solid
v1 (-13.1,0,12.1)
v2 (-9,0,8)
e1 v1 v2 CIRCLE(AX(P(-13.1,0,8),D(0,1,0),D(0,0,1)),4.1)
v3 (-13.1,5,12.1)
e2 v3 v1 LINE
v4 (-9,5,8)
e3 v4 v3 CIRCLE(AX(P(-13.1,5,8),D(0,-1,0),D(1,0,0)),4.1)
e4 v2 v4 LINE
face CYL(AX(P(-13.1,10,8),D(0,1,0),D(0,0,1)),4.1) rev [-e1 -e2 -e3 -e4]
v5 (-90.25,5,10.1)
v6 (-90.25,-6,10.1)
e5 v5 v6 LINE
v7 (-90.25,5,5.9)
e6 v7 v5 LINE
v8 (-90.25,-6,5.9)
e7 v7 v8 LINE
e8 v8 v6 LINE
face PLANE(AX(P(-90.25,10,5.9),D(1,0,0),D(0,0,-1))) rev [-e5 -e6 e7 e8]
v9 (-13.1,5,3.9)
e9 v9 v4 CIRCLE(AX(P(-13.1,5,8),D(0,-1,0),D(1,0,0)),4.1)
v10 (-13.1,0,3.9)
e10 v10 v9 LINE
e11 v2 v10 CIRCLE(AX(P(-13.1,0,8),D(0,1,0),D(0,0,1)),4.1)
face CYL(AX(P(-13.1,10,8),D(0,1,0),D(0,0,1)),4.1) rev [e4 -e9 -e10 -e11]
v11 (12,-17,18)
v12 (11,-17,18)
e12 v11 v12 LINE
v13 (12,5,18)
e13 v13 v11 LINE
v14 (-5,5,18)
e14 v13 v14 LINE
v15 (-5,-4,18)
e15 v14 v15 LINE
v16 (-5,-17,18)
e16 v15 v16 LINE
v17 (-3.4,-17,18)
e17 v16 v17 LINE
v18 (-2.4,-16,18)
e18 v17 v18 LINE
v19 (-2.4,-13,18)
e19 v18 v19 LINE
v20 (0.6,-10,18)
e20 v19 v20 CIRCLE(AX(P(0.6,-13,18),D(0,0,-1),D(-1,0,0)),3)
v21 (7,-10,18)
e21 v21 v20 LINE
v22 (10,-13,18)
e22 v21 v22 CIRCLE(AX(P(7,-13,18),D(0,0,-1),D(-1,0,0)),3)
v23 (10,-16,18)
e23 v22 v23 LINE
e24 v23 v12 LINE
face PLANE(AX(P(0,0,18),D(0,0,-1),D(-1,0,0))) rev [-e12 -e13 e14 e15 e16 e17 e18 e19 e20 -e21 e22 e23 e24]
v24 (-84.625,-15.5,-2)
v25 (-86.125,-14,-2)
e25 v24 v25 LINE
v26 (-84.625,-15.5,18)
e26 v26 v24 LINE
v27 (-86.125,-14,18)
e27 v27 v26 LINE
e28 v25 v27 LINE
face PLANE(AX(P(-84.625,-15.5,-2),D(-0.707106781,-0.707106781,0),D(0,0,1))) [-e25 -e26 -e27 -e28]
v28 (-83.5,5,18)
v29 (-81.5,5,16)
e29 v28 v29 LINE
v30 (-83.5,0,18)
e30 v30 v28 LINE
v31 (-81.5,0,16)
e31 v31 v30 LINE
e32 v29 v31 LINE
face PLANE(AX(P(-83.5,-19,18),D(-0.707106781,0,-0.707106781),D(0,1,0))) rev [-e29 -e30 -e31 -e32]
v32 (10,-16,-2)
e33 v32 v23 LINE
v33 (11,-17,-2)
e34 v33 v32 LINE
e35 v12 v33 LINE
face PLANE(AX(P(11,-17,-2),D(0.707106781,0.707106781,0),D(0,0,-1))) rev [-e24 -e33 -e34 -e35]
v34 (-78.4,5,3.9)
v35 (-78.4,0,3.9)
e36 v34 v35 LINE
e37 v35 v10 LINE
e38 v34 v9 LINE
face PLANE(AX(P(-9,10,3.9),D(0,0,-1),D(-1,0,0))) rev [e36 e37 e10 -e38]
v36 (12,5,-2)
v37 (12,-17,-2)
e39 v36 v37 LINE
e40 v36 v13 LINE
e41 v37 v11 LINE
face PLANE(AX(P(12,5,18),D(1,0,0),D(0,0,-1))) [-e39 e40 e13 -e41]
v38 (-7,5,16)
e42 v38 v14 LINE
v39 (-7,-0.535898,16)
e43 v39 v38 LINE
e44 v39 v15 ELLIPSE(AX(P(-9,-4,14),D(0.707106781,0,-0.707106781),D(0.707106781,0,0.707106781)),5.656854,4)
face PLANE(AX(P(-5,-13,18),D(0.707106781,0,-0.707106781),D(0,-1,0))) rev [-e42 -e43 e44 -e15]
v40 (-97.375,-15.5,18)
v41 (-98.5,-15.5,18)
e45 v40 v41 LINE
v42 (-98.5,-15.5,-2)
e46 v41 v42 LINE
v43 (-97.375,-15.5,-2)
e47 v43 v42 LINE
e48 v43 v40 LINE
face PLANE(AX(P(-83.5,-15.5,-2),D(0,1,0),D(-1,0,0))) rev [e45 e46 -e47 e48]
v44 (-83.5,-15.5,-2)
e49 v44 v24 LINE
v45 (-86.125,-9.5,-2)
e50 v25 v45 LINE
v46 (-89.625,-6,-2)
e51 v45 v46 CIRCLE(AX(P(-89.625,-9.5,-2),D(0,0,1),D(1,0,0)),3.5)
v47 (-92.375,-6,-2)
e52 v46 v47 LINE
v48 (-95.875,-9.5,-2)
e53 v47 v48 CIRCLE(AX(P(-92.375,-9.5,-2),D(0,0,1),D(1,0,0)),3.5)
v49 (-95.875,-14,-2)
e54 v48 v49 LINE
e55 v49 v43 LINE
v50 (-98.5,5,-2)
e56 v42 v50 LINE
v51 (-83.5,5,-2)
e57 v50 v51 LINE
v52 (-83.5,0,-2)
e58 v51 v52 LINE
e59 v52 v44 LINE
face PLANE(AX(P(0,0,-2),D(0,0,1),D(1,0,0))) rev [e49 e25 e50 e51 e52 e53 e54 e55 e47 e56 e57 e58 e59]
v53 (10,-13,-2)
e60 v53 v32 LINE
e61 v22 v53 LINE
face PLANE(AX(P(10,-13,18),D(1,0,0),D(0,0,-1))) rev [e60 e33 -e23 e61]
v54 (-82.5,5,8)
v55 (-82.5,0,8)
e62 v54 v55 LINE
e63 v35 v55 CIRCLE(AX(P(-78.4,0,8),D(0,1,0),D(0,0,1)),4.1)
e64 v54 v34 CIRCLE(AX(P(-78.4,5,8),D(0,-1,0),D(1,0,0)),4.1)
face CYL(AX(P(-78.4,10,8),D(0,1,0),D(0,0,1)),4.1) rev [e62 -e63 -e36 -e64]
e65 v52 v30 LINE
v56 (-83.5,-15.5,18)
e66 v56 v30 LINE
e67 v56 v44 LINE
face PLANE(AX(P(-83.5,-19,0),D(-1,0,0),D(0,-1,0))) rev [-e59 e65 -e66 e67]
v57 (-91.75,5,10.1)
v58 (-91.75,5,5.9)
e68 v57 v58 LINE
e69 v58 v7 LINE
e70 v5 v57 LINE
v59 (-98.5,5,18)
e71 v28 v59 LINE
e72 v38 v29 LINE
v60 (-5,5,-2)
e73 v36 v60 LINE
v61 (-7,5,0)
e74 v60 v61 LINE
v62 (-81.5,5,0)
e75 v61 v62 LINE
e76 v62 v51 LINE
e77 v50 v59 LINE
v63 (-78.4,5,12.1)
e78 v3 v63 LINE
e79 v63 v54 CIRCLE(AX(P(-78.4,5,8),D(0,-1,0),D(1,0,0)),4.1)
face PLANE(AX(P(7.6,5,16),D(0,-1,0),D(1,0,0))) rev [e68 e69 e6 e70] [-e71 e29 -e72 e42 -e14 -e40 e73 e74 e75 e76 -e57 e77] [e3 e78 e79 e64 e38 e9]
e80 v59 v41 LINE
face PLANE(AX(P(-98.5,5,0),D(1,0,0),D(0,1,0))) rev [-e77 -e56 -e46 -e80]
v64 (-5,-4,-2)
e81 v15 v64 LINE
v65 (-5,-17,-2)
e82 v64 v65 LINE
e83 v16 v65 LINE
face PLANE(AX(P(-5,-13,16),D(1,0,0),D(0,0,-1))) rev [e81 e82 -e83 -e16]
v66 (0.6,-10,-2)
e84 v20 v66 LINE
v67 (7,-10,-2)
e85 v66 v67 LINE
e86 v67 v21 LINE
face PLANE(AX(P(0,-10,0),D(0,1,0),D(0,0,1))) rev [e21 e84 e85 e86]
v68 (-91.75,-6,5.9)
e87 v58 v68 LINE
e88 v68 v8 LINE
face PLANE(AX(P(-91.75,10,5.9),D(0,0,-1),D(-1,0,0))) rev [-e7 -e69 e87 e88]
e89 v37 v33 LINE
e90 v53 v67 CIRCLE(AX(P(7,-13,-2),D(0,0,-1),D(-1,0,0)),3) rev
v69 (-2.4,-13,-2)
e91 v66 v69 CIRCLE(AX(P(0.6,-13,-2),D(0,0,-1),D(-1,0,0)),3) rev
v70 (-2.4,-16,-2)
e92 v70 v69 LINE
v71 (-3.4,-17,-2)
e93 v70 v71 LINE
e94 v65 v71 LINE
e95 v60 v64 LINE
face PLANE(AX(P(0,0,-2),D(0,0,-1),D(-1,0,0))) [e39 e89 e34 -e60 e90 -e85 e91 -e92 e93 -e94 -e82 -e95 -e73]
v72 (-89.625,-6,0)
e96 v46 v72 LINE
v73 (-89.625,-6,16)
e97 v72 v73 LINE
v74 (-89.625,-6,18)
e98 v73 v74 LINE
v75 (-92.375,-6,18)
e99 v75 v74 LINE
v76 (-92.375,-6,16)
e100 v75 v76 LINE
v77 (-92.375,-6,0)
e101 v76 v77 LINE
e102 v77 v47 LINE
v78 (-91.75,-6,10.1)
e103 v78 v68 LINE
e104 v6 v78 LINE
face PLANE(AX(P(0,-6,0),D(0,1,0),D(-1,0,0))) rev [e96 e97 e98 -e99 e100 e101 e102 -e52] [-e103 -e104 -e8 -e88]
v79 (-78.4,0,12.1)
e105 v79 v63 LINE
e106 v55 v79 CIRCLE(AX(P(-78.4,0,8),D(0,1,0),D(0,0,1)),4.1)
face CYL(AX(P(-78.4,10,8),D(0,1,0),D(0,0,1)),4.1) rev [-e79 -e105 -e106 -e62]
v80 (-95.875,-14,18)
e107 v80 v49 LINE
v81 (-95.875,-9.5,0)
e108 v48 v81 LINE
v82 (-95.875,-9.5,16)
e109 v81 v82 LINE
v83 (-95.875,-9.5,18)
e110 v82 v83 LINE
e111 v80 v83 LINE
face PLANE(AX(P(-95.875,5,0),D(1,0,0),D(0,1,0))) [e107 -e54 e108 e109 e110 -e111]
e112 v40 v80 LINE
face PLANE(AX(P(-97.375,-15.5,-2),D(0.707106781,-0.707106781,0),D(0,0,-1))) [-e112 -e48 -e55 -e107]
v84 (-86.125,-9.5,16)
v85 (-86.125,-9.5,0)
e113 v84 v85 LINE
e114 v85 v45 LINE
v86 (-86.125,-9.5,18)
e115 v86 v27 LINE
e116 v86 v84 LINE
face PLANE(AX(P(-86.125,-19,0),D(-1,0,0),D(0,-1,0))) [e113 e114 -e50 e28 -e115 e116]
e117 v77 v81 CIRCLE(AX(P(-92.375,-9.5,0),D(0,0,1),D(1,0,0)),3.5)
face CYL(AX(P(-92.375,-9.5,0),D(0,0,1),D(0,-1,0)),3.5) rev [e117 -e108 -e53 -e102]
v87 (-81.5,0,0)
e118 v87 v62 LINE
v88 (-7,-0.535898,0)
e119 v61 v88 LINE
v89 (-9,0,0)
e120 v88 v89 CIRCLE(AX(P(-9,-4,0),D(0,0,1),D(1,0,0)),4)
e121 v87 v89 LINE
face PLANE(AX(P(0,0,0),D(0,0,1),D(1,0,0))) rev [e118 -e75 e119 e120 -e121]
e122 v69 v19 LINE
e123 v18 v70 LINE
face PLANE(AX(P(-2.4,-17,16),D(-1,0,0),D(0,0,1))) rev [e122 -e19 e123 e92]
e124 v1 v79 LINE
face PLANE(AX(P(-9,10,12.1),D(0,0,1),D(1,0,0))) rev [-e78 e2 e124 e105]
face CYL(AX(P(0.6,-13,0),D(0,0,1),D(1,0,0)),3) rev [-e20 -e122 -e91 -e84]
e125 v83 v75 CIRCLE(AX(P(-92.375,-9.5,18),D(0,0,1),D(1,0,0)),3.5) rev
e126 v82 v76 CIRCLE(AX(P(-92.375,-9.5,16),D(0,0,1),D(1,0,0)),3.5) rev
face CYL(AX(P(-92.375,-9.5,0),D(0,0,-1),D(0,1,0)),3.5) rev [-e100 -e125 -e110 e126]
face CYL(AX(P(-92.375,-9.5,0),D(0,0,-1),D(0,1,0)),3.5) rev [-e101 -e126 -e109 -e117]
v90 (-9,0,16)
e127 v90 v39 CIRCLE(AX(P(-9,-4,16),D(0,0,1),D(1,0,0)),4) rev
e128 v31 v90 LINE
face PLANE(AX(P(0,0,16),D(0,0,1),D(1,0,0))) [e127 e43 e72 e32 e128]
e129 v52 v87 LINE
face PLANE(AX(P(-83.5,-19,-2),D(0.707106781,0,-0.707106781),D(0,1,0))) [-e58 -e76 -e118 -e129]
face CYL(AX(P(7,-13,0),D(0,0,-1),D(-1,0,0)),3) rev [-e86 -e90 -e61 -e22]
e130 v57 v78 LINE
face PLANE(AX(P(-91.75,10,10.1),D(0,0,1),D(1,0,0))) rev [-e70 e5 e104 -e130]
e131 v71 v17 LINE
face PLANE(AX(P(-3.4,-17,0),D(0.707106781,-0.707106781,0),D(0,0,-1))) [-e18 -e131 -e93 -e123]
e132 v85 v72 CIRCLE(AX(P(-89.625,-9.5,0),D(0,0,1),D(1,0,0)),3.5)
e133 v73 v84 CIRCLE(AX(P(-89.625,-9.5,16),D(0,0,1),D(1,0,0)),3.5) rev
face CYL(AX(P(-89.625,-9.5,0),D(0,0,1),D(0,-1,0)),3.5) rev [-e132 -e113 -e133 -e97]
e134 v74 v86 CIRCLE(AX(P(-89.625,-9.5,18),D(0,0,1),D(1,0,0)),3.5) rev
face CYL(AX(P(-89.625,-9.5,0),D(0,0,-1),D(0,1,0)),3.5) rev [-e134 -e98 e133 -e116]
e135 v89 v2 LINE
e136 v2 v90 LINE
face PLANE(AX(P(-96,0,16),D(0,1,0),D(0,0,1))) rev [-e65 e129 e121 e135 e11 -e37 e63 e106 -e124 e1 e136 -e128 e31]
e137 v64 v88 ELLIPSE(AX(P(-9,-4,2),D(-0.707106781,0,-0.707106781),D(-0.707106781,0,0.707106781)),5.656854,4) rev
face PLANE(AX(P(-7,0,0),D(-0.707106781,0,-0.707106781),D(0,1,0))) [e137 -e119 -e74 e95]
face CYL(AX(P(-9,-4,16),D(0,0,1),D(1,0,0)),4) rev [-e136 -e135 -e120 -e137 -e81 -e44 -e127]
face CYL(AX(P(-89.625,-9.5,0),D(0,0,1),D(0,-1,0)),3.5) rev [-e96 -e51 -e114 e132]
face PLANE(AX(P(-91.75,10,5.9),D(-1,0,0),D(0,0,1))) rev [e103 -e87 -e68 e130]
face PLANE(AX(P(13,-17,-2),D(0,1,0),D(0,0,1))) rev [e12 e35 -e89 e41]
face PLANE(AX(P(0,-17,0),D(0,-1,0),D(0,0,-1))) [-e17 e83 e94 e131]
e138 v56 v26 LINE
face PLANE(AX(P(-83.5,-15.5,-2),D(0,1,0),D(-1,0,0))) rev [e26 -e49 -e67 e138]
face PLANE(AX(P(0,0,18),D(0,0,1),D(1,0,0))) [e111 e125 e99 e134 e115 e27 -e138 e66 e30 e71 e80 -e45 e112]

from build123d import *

# Parameters (mm, degrees)
EXTRUDE_1_DEPTH       = 16
SKETCH_4_W            = 1.5
SKETCH_4_H            = 4.2
SKETCH_4_W_2          = 73.5
SKETCH_4_H_2          = 8.2
CUT_EXTRUDE_1_DEPTH   = 10
FILLET_1_R            = 4.1
SKETCH_6_W            = 10
SKETCH_6_H            = 16
SKETCH_6_W_2          = 1.5
SKETCH_6_H_2          = 4.2
EXTRUDE_4_DEPTH       = 11
EXTRUDE_6_DEPTH       = 13
EXTRUDE_6_DEPTH_BACK  = 11
SKETCH_10_W           = 0.125
SKETCH_10_H           = 16
SKETCH_10_W_2         = 2.5
FILLET_2_R            = 3.5
EXTRUDE_7_DEPTH       = 2
EXTRUDE_8_DEPTH       = 2
FILLET_4_R            = 3.5
CUT_EXTRUDE_START     = -15
SKETCH_13_W           = 20
SKETCH_13_H           = 3.5
CUT_EXTRUDE_2_DEPTH   = 15
CHAMFER_1_SIZE        = 2
CHAMFER_2_SIZE        = 1.5
SKETCH_14_W           = 5
SKETCH_14_H           = 16
EXTRUDE_9_DEPTH       = 13
SKETCH_15_W           = 2.6
SKETCH_15_H           = 16
EXTRUDE_10_DEPTH      = 4
EXTRUDE_11_DEPTH      = 2
EXTRUDE_11_DEPTH_BACK = 18
CHAMFER_4_SIZE        = 2
SKETCH_19_W           = 12
SKETCH_19_H           = 20
EXTRUDE_12_DEPTH      = 26.5
SKETCH_20_W           = 10
SKETCH_20_H           = 20
CUT_EXTRUDE_3_DEPTH   = 8.5
FILLET_6_R            = 4
SKETCH_21_W           = 12.4
SKETCH_21_H           = 20
CUT_EXTRUDE_4_DEPTH   = 3
FILLET_7_R            = 3
SKETCH_22_W           = 20
SKETCH_22_H           = 4.5
CUT_EXTRUDE_5_DEPTH   = 3
CHAMFER_5_SIZE        = 1


# Some blends are built 0.0001 mm under size
with BuildPart() as part:
    # 스케치1 → 보스-돌출1 (new body)
    with BuildSketch(Plane.XY):
        Polygon((-96, 0), (0, 0), (0, -21.5), (7.6, -21.5), (7.6, 5), (-96, 5), align=None)
    extrude(amount=EXTRUDE_1_DEPTH)

    # 스케치4 → 컷-돌출1 (cut)
    with BuildSketch(Plane.XZ):
        with Locations((-91, 8)):
            Rectangle(SKETCH_4_W, SKETCH_4_H)
        with Locations((-45.75, 8)):
            Rectangle(SKETCH_4_W_2, SKETCH_4_H_2)
    extrude(amount=-CUT_EXTRUDE_1_DEPTH, mode=Mode.SUBTRACT)

    # 필렛1
    fillet_1_edges = [part.edges().sort_by_distance(p)[0] for p in [
        (-82.5, 2.5, 3.9),
        (-82.5, 2.5, 12.1),
        (-9, 2.5, 3.9),
        (-9, 2.5, 12.1),
    ]]
    fillet(fillet_1_edges, radius=FILLET_1_R - 0.0001)  # a hair under: the kernel refuses the full size

    # 스케치6 → 보스-돌출4 (add)
    with BuildSketch(Plane(origin=(0, 5, 0), x_dir=(1, 0, 0), z_dir=(0, 1, 0))):
        with Locations((-91, -8)):
            Rectangle(SKETCH_6_W, SKETCH_6_H)
        with Locations((-91, -8)):
            Rectangle(SKETCH_6_W_2, SKETCH_6_H_2, mode=Mode.SUBTRACT)
    extrude(amount=-EXTRUDE_4_DEPTH)

    # 스케치10 → 보스-돌출6 (add, two sides: drawn at the far end of the back side and taken through both)
    with BuildSketch(Plane.XZ.offset(6).offset(-EXTRUDE_6_DEPTH_BACK)):
        with Locations((-95.9375, 8)):
            Rectangle(SKETCH_10_W, SKETCH_10_H)
        with Locations((-97.25, 8)):
            Rectangle(SKETCH_10_W_2, SKETCH_10_H)
        with Locations((-86.0625, 8)):
            Rectangle(SKETCH_10_W, SKETCH_10_H)
        with Locations((-84.75, 8)):
            Rectangle(SKETCH_10_W_2, SKETCH_10_H)
    extrude(amount=EXTRUDE_6_DEPTH + EXTRUDE_6_DEPTH_BACK)

    # 필렛2
    fillet_2_edges = [part.edges().sort_by_distance(p)[0] for p in [
        (-95.875, -6, 8),
        (-86.125, -6, 8),
    ]]
    fillet(fillet_2_edges, radius=FILLET_2_R)

    # 스케치11 → 보스-돌출7 (add)
    with BuildSketch(Plane.XY.offset(16)):
        Polygon((-98.5, 5), (-98.5, -19), (-95.875, -19), (-95.875, -6), (-86.125, -6), (-86.125, -19), (-83.5, -19), (-83.5, 5), align=None)
    extrude(amount=EXTRUDE_7_DEPTH)

    # 스케치12 → 보스-돌출8 (add)
    with BuildSketch(Plane(origin=(0, 0, 0), x_dir=(-1, 0, 0), z_dir=(0, 0, -1))):
        Polygon((83.5, 5), (83.5, -19), (86.125, -19), (86.125, -6), (95.875, -6), (95.875, -19), (98.5, -19), (98.5, 5), align=None)
    extrude(amount=EXTRUDE_8_DEPTH)

    # 필렛4
    fillet_4_edges = [part.edges().sort_by_distance(p)[0] for p in [
        (-95.875, -6, -1),
        (-86.125, -6, -1),
        (-86.125, -6, 17),
        (-95.875, -6, 17),
    ]]
    fillet(fillet_4_edges, radius=FILLET_4_R)

    # 스케치13 → 컷-돌출2 (cut)
    with BuildSketch(Plane.ZY.offset(98.5).offset(CUT_EXTRUDE_START)):
        with Locations((8, -17.25)):
            Rectangle(SKETCH_13_W, SKETCH_13_H)
    extrude(amount=CUT_EXTRUDE_2_DEPTH, mode=Mode.SUBTRACT)

    # 모따기1
    chamfer_1_edges = [part.edges().sort_by_distance(p)[0] for p in [
        (-83.5, 2.5, 0),
        (-83.5, 2.5, 16),
    ]]
    chamfer(chamfer_1_edges, length=CHAMFER_1_SIZE - 0.0001)  # a hair under: the kernel refuses the full size

    # 모따기2
    chamfer_2_edges = [part.edges().sort_by_distance(p)[0] for p in [
        (-95.875, -15.5, 8),
        (-86.125, -15.5, 8),
    ]]
    chamfer(chamfer_2_edges, length=CHAMFER_2_SIZE)

    # 스케치14 → 보스-돌출9 (add)
    with BuildSketch(Plane.XZ):
        with Locations((-2.5, 8)):
            Rectangle(SKETCH_14_W, SKETCH_14_H)
    extrude(amount=EXTRUDE_9_DEPTH)

    # 스케치15 → 보스-돌출10 (add)
    with BuildSketch(Plane.XZ.offset(13)):
        with Locations((-3.7, 8)):
            Rectangle(SKETCH_15_W, SKETCH_15_H)
    extrude(amount=EXTRUDE_10_DEPTH)

    # 스케치18 → 보스-돌출11 (add, two sides: drawn at the far end of the back side and taken through both)
    with BuildSketch(Plane.XY.offset(16).offset(-EXTRUDE_11_DEPTH_BACK)):
        Polygon((-5, -17), (-5, 5), (7.6, 5), (7.6, -21.5), (0, -21.5), (0, -13), (-2.4, -13), (-2.4, -17), align=None)
    extrude(amount=EXTRUDE_11_DEPTH + EXTRUDE_11_DEPTH_BACK)

    # 모따기4
    chamfer_4_edges = [part.edges().sort_by_distance(p)[0] for p in [
        (-5, 2.5, 0),
        (-5, 2.5, 16),
    ]]
    chamfer(chamfer_4_edges, length=CHAMFER_4_SIZE - 0.0001)  # a hair under: the kernel refuses the full size

    # 스케치19 → 보스-돌출12 (add)
    with BuildSketch(Plane.XZ.offset(21.5)):
        with Locations((6, 8)):
            Rectangle(SKETCH_19_W, SKETCH_19_H)
    extrude(amount=-EXTRUDE_12_DEPTH)

    # 스케치20 → 컷-돌출3 (cut)
    with BuildSketch(Plane.XZ.offset(21.5)):
        with Locations((5, 8)):
            Rectangle(SKETCH_20_W, SKETCH_20_H)
    extrude(amount=-CUT_EXTRUDE_3_DEPTH, mode=Mode.SUBTRACT)

    # 필렛6
    # the kernel refuses this fillet: 4 mm, written as the material it adds along each edge
    with BuildSketch(Plane(origin=(-5, 0, -11.9999), x_dir=(-1, 0, 0), z_dir=(0, 0, 1))) as fillet_6_piece_1_section:
        with BuildLine():
            CenterArc((FILLET_6_R, FILLET_6_R), FILLET_6_R, 180, 90)
            Line((0, FILLET_6_R), (0, 0))
            Line((0, 0), (FILLET_6_R, 0))
        make_face()
    fillet_6_piece_1 = extrude(amount=39.9998, mode=Mode.PRIVATE)
    fillet_6_piece_1 = split(fillet_6_piece_1, bisect_by=Plane(origin=(-5.422654617, -1.217149551, 0), z_dir=(0, 0, -1)), keep=Keep.TOP, mode=Mode.PRIVATE)
    fillet_6_piece_1 = split(fillet_6_piece_1, bisect_by=Plane(origin=(-5.818327379, -1.217149551, -1.181572621), z_dir=(0.7071067811865476, 0, 0.7071067811865476)), keep=Keep.TOP, mode=Mode.PRIVATE)
    fillet_6_piece_1 = split(fillet_6_piece_1, bisect_by=Plane(origin=(-5.422654617, -1.217149551, -2), z_dir=(0, 0, 1)), keep=Keep.TOP, mode=Mode.PRIVATE)
    add(fillet_6_piece_1)
    with BuildSketch(Plane(origin=(-5, 0, -11.9999), x_dir=(-1, 0, 0), z_dir=(0, 0, 1))) as fillet_6_piece_2_section:
        with BuildLine():
            CenterArc((FILLET_6_R, FILLET_6_R), FILLET_6_R, 180, 90)
            Line((0, FILLET_6_R), (0, 0))
            Line((0, 0), (FILLET_6_R, 0))
        make_face()
    fillet_6_piece_2 = extrude(amount=39.9998, mode=Mode.PRIVATE)
    fillet_6_piece_2 = split(fillet_6_piece_2, bisect_by=Plane(origin=(-8.054414612, -0.03475648, 0), z_dir=(0, 0, 1)), keep=Keep.TOP, mode=Mode.PRIVATE)
    fillet_6_piece_2 = split(fillet_6_piece_2, bisect_by=Plane(origin=(-7.790785959, -0.03475648, 0.790885959), z_dir=(-0.7071067811865476, 0, -0.7071067811865476)), keep=Keep.TOP, mode=Mode.PRIVATE)
    add(fillet_6_piece_2)
    with BuildSketch(Plane(origin=(-5, 0, -11.9999), x_dir=(-1, 0, 0), z_dir=(0, 0, 1))) as fillet_6_piece_3_section:
        with BuildLine():
            CenterArc((FILLET_6_R, FILLET_6_R), FILLET_6_R, 180, 90)
            Line((0, FILLET_6_R), (0, 0))
            Line((0, 0), (FILLET_6_R, 0))
        make_face()
    fillet_6_piece_3 = extrude(amount=39.9998, mode=Mode.PRIVATE)
    fillet_6_piece_3 = split(fillet_6_piece_3, bisect_by=Plane(origin=(-5.88355316, -0.914507111, 0), z_dir=(0, 0, 1)), keep=Keep.TOP, mode=Mode.PRIVATE)
    fillet_6_piece_3 = split(fillet_6_piece_3, bisect_by=Plane(origin=(-5.88355316, -0.914507111, 16), z_dir=(0, 0, -1)), keep=Keep.TOP, mode=Mode.PRIVATE)
    fillet_6_piece_3 = split(fillet_6_piece_3, bisect_by=Plane(origin=(-10.44172658, -0.914507111, 12.55817342), z_dir=(0.7071067811865476, 0, -0.7071067811865476)), keep=Keep.TOP, mode=Mode.PRIVATE)
    fillet_6_piece_3 = split(fillet_6_piece_3, bisect_by=Plane(origin=(-10.44172658, -0.914507111, 3.44182658), z_dir=(0.7071067811865476, 0, 0.7071067811865476)), keep=Keep.TOP, mode=Mode.PRIVATE)
    add(fillet_6_piece_3)
    with BuildSketch(Plane(origin=(-5, 0, -11.9999), x_dir=(-1, 0, 0), z_dir=(0, 0, 1))) as fillet_6_piece_4_section:
        with BuildLine():
            CenterArc((FILLET_6_R, FILLET_6_R), FILLET_6_R, 180, 90)
            Line((0, FILLET_6_R), (0, 0))
            Line((0, 0), (FILLET_6_R, 0))
        make_face()
    fillet_6_piece_4 = extrude(amount=39.9998, mode=Mode.PRIVATE)
    fillet_6_piece_4 = split(fillet_6_piece_4, bisect_by=Plane(origin=(-5.422654617, -1.217149551, 16), z_dir=(0, 0, 1)), keep=Keep.TOP, mode=Mode.PRIVATE)
    fillet_6_piece_4 = split(fillet_6_piece_4, bisect_by=Plane(origin=(-5.818327379, -1.217149551, 17.181572621), z_dir=(0.7071067811865476, 0, -0.7071067811865476)), keep=Keep.TOP, mode=Mode.PRIVATE)
    fillet_6_piece_4 = split(fillet_6_piece_4, bisect_by=Plane(origin=(-5.422654617, -1.217149551, 18), z_dir=(0, 0, -1)), keep=Keep.TOP, mode=Mode.PRIVATE)
    add(fillet_6_piece_4)
    with BuildSketch(Plane(origin=(-5, 0, -11.9999), x_dir=(-1, 0, 0), z_dir=(0, 0, 1))) as fillet_6_piece_5_section:
        with BuildLine():
            CenterArc((FILLET_6_R, FILLET_6_R), FILLET_6_R, 180, 90)
            Line((0, FILLET_6_R), (0, 0))
            Line((0, 0), (FILLET_6_R, 0))
        make_face()
    fillet_6_piece_5 = extrude(amount=39.9998, mode=Mode.PRIVATE)
    fillet_6_piece_5 = split(fillet_6_piece_5, bisect_by=Plane(origin=(-8.054414612, -0.03475648, 16), z_dir=(0, 0, -1)), keep=Keep.TOP, mode=Mode.PRIVATE)
    fillet_6_piece_5 = split(fillet_6_piece_5, bisect_by=Plane(origin=(-7.790785959, -0.03475648, 15.209114041), z_dir=(-0.7071067811865476, 0, 0.7071067811865476)), keep=Keep.TOP, mode=Mode.PRIVATE)
    add(fillet_6_piece_5)

    # 스케치21 → 컷-돌출4 (cut)
    with BuildSketch(Plane.XZ.offset(13)):
        with Locations((3.8, 8)):
            Rectangle(SKETCH_21_W, SKETCH_21_H)
    extrude(amount=-CUT_EXTRUDE_4_DEPTH, mode=Mode.SUBTRACT)

    # 필렛7
    fillet_7_edges = [part.edges().sort_by_distance(p)[0] for p in [
        (10, -10, 8),
        (-2.4, -10, 8),
    ]]
    fillet(fillet_7_edges, radius=FILLET_7_R)

    # 스케치22 → 컷-돌출5 (cut)
    with BuildSketch(Plane.ZY.offset(-10)):
        with Locations((8, -19.25)):
            Rectangle(SKETCH_22_W, SKETCH_22_H)
    extrude(amount=-CUT_EXTRUDE_5_DEPTH, mode=Mode.SUBTRACT)

    # 모따기5
    chamfer_5_edges = [part.edges().sort_by_distance(p)[0] for p in [
        (-2.4, -17, 8),
        (10, -17, 8),
    ]]
    chamfer(chamfer_5_edges, length=CHAMFER_5_SIZE)


solid = part.part
